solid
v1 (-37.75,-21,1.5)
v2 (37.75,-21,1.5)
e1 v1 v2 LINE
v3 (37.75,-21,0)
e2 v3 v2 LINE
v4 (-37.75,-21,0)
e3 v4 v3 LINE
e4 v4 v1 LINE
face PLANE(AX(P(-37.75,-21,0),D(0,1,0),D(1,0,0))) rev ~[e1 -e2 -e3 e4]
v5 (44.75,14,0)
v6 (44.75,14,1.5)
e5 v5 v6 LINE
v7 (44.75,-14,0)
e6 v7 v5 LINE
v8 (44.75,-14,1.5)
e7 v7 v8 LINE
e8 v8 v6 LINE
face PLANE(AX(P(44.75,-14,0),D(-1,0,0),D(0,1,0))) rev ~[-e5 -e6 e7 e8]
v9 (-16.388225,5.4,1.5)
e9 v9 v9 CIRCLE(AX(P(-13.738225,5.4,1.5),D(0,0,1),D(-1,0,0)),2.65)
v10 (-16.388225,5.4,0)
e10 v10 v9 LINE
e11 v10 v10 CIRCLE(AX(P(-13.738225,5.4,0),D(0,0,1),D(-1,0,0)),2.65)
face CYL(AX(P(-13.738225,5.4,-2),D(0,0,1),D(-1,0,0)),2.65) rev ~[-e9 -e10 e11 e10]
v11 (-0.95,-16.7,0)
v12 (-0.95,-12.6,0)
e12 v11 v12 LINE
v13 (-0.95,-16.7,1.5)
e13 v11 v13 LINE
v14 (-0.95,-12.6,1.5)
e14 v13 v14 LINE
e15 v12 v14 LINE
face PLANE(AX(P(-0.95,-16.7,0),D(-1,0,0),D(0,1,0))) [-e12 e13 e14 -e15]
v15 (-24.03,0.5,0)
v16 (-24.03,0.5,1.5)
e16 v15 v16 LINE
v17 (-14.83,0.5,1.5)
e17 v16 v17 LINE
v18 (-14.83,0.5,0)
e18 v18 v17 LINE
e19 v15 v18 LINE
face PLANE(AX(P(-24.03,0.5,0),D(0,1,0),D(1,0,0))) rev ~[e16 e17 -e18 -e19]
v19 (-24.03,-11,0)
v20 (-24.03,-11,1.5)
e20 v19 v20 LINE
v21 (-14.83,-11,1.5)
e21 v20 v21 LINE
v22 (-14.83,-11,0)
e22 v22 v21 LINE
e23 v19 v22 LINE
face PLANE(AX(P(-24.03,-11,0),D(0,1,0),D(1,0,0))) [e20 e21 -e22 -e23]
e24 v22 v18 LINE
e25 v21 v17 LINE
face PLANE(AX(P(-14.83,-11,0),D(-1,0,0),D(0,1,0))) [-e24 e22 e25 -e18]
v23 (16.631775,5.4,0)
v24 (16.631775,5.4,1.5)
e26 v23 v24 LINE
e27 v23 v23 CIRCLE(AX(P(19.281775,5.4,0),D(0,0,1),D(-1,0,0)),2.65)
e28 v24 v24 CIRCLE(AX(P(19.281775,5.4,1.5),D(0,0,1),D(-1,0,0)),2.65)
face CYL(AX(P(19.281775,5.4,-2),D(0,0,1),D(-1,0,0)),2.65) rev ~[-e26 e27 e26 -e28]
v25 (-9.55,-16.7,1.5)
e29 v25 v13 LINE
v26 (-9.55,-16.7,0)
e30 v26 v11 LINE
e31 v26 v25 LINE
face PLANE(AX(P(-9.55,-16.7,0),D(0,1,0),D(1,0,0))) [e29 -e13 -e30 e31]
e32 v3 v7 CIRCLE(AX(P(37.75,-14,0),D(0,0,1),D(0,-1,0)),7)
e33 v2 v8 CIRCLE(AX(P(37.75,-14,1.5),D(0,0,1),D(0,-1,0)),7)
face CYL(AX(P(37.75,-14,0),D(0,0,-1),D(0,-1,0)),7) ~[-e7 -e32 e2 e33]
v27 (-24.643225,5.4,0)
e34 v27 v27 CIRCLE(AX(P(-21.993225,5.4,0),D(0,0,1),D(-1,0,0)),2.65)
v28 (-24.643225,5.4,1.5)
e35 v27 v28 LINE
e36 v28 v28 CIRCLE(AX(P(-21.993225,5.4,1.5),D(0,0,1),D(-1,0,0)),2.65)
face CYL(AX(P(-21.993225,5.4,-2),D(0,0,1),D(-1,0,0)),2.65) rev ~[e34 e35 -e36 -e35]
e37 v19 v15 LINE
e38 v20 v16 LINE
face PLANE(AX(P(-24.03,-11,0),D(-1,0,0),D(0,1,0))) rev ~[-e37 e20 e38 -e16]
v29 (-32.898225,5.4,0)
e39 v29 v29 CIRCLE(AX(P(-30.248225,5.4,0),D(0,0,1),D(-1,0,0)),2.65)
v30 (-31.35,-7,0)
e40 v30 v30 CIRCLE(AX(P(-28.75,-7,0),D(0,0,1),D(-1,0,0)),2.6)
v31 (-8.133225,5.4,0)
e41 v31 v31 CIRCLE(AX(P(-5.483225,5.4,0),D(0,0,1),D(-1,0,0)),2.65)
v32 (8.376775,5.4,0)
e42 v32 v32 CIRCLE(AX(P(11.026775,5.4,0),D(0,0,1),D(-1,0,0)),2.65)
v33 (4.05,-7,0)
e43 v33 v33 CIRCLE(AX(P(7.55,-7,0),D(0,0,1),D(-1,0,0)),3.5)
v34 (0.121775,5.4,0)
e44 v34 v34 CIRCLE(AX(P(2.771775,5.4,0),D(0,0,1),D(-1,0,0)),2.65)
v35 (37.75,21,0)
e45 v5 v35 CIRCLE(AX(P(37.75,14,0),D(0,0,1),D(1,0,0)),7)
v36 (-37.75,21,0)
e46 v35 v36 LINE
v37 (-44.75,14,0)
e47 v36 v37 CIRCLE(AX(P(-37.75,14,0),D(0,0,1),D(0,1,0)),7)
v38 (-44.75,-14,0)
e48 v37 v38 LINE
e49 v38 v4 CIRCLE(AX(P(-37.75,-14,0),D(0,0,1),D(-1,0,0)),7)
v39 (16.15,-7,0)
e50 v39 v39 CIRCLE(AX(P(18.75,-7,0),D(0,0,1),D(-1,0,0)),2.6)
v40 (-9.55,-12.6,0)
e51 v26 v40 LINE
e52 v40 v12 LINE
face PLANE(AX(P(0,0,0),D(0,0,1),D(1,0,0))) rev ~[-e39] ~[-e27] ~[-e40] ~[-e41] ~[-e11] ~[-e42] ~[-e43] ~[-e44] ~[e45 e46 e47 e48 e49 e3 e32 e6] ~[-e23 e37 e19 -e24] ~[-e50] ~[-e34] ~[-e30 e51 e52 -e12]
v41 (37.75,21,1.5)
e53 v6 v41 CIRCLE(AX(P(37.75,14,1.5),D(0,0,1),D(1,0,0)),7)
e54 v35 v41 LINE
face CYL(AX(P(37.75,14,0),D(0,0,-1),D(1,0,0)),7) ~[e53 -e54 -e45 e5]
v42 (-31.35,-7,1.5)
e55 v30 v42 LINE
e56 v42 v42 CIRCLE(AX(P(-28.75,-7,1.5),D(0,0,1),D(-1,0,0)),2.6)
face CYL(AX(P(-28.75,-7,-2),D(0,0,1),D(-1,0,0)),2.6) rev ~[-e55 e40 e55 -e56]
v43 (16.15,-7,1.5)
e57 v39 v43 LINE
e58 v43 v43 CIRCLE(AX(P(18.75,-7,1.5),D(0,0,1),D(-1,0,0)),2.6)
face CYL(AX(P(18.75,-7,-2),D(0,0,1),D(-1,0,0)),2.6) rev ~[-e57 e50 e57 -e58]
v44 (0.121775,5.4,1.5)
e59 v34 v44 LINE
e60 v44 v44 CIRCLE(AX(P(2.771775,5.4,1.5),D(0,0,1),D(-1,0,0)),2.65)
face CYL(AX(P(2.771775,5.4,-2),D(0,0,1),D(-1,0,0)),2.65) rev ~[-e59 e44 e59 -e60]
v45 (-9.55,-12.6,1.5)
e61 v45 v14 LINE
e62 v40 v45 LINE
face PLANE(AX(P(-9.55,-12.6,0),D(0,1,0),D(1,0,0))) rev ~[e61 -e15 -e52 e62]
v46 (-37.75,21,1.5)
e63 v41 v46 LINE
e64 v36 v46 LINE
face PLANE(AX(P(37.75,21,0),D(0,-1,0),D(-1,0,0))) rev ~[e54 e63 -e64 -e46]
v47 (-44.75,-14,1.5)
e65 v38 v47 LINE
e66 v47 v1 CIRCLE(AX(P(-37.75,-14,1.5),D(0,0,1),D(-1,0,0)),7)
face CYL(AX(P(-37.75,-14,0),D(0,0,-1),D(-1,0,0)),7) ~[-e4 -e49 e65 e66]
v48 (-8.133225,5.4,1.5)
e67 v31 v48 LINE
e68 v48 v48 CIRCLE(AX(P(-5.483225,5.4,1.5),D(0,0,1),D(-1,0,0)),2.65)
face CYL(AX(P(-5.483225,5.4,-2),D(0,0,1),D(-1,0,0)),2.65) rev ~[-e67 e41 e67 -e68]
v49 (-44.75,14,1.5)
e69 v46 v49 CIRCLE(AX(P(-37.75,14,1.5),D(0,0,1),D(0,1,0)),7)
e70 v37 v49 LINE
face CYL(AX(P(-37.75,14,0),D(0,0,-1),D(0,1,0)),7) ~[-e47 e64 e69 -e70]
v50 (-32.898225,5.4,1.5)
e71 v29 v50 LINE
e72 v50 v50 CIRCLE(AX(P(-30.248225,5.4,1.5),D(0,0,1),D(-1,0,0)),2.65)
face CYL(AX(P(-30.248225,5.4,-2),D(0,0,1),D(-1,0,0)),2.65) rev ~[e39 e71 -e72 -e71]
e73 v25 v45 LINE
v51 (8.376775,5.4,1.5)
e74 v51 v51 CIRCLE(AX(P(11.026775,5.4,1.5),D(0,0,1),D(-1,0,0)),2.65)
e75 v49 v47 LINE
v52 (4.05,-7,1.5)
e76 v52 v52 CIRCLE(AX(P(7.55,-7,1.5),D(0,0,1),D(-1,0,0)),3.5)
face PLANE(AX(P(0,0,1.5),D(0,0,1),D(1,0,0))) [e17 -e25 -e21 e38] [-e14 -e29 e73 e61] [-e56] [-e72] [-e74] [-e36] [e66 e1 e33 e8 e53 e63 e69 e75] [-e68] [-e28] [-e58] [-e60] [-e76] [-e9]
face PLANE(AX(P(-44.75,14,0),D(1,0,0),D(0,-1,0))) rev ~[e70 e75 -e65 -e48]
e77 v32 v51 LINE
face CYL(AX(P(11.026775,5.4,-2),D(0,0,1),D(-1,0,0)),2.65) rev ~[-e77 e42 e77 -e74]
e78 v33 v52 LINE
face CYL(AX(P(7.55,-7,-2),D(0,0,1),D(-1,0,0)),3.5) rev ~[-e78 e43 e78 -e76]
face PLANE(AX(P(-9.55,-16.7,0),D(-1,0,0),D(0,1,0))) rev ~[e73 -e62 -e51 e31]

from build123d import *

# Parameters (mm, degrees)
F0_W     = 8.6
F0_H     = 4.1
F0_W_2   = 9.2
F0_H_2   = 11.5
F1_DEPTH = 1.5
F2_D     = 5.2
F2_DEPTH = 2
F2_TIP   = 1.5622376095
F3_D     = 7
F3_DEPTH = 2
F3_TIP   = 2.1030121666
F4_D     = 5.3
F4_DEPTH = 2
F4_TIP   = 1.5922806404


# Not quite as in the source:
# - a feature names something its author has since deleted; it is built from what else it names


with BuildPart() as f1:
    # F0 (on Top) → F1 (new body)
    with BuildSketch(Plane.XY):
        with BuildLine():
            Line((-37.75, -21), (37.75, -21))
            ThreePointArc((37.75, -21), (42.6997474683, -18.9497474683), (44.75, -14))
            Line((44.75, -14), (44.75, 14))
            ThreePointArc((44.75, 14), (42.6997474683, 18.9497474683), (37.75, 21))
            Line((37.75, 21), (-37.75, 21))
            ThreePointArc((-37.75, 21), (-42.6997474683, 18.9497474683), (-44.75, 14))
            Line((-44.75, 14), (-44.75, -14))
            ThreePointArc((-44.75, -14), (-42.6997474683, -18.9497474683), (-37.75, -21))
        make_face()
        with Locations((-5.25, -14.65)):
            Rectangle(F0_W, F0_H, mode=Mode.SUBTRACT)
        with Locations((-19.43, -5.25)):
            Rectangle(F0_W_2, F0_H_2, mode=Mode.SUBTRACT)
    extrude(amount=F1_DEPTH)

    # F2
    with Locations(Plane(origin=(0, 0, 0), x_dir=(1, 0, 0), z_dir=(0, 0, -1))):
        with Locations((18.75, 7), (-28.75, 7)):
            Hole(F2_D / 2, depth=F2_DEPTH)
            with Locations((0, 0, -(F2_DEPTH + F2_TIP / 2))):  # 118° drill point
                Cone(0, F2_D / 2, F2_TIP, mode=Mode.SUBTRACT)

    # F3
    with Locations(Plane(origin=(0, 0, 0), x_dir=(1, 0, 0), z_dir=(0, 0, -1))):
        with Locations((7.55, 7)):
            Hole(F3_D / 2, depth=F3_DEPTH)
            with Locations((0, 0, -(F3_DEPTH + F3_TIP / 2))):  # 118° drill point
                Cone(0, F3_D / 2, F3_TIP, mode=Mode.SUBTRACT)

    # F4
    with Locations(Plane(origin=(0, 0, 0), x_dir=(1, 0, 0), z_dir=(0, 0, -1))):
        with Locations((-30.2482247353, -5.4), (-21.9932247353, -5.4), (-13.7382247353, -5.4), (-5.4832247353, -5.4), (2.7717752647, -5.4), (11.0267752647, -5.4), (19.2817752647, -5.4)):
            Hole(F4_D / 2, depth=F4_DEPTH)
            with Locations((0, 0, -(F4_DEPTH + F4_TIP / 2))):  # 118° drill point
                Cone(0, F4_D / 2, F4_TIP, mode=Mode.SUBTRACT)


solid = f1.part
